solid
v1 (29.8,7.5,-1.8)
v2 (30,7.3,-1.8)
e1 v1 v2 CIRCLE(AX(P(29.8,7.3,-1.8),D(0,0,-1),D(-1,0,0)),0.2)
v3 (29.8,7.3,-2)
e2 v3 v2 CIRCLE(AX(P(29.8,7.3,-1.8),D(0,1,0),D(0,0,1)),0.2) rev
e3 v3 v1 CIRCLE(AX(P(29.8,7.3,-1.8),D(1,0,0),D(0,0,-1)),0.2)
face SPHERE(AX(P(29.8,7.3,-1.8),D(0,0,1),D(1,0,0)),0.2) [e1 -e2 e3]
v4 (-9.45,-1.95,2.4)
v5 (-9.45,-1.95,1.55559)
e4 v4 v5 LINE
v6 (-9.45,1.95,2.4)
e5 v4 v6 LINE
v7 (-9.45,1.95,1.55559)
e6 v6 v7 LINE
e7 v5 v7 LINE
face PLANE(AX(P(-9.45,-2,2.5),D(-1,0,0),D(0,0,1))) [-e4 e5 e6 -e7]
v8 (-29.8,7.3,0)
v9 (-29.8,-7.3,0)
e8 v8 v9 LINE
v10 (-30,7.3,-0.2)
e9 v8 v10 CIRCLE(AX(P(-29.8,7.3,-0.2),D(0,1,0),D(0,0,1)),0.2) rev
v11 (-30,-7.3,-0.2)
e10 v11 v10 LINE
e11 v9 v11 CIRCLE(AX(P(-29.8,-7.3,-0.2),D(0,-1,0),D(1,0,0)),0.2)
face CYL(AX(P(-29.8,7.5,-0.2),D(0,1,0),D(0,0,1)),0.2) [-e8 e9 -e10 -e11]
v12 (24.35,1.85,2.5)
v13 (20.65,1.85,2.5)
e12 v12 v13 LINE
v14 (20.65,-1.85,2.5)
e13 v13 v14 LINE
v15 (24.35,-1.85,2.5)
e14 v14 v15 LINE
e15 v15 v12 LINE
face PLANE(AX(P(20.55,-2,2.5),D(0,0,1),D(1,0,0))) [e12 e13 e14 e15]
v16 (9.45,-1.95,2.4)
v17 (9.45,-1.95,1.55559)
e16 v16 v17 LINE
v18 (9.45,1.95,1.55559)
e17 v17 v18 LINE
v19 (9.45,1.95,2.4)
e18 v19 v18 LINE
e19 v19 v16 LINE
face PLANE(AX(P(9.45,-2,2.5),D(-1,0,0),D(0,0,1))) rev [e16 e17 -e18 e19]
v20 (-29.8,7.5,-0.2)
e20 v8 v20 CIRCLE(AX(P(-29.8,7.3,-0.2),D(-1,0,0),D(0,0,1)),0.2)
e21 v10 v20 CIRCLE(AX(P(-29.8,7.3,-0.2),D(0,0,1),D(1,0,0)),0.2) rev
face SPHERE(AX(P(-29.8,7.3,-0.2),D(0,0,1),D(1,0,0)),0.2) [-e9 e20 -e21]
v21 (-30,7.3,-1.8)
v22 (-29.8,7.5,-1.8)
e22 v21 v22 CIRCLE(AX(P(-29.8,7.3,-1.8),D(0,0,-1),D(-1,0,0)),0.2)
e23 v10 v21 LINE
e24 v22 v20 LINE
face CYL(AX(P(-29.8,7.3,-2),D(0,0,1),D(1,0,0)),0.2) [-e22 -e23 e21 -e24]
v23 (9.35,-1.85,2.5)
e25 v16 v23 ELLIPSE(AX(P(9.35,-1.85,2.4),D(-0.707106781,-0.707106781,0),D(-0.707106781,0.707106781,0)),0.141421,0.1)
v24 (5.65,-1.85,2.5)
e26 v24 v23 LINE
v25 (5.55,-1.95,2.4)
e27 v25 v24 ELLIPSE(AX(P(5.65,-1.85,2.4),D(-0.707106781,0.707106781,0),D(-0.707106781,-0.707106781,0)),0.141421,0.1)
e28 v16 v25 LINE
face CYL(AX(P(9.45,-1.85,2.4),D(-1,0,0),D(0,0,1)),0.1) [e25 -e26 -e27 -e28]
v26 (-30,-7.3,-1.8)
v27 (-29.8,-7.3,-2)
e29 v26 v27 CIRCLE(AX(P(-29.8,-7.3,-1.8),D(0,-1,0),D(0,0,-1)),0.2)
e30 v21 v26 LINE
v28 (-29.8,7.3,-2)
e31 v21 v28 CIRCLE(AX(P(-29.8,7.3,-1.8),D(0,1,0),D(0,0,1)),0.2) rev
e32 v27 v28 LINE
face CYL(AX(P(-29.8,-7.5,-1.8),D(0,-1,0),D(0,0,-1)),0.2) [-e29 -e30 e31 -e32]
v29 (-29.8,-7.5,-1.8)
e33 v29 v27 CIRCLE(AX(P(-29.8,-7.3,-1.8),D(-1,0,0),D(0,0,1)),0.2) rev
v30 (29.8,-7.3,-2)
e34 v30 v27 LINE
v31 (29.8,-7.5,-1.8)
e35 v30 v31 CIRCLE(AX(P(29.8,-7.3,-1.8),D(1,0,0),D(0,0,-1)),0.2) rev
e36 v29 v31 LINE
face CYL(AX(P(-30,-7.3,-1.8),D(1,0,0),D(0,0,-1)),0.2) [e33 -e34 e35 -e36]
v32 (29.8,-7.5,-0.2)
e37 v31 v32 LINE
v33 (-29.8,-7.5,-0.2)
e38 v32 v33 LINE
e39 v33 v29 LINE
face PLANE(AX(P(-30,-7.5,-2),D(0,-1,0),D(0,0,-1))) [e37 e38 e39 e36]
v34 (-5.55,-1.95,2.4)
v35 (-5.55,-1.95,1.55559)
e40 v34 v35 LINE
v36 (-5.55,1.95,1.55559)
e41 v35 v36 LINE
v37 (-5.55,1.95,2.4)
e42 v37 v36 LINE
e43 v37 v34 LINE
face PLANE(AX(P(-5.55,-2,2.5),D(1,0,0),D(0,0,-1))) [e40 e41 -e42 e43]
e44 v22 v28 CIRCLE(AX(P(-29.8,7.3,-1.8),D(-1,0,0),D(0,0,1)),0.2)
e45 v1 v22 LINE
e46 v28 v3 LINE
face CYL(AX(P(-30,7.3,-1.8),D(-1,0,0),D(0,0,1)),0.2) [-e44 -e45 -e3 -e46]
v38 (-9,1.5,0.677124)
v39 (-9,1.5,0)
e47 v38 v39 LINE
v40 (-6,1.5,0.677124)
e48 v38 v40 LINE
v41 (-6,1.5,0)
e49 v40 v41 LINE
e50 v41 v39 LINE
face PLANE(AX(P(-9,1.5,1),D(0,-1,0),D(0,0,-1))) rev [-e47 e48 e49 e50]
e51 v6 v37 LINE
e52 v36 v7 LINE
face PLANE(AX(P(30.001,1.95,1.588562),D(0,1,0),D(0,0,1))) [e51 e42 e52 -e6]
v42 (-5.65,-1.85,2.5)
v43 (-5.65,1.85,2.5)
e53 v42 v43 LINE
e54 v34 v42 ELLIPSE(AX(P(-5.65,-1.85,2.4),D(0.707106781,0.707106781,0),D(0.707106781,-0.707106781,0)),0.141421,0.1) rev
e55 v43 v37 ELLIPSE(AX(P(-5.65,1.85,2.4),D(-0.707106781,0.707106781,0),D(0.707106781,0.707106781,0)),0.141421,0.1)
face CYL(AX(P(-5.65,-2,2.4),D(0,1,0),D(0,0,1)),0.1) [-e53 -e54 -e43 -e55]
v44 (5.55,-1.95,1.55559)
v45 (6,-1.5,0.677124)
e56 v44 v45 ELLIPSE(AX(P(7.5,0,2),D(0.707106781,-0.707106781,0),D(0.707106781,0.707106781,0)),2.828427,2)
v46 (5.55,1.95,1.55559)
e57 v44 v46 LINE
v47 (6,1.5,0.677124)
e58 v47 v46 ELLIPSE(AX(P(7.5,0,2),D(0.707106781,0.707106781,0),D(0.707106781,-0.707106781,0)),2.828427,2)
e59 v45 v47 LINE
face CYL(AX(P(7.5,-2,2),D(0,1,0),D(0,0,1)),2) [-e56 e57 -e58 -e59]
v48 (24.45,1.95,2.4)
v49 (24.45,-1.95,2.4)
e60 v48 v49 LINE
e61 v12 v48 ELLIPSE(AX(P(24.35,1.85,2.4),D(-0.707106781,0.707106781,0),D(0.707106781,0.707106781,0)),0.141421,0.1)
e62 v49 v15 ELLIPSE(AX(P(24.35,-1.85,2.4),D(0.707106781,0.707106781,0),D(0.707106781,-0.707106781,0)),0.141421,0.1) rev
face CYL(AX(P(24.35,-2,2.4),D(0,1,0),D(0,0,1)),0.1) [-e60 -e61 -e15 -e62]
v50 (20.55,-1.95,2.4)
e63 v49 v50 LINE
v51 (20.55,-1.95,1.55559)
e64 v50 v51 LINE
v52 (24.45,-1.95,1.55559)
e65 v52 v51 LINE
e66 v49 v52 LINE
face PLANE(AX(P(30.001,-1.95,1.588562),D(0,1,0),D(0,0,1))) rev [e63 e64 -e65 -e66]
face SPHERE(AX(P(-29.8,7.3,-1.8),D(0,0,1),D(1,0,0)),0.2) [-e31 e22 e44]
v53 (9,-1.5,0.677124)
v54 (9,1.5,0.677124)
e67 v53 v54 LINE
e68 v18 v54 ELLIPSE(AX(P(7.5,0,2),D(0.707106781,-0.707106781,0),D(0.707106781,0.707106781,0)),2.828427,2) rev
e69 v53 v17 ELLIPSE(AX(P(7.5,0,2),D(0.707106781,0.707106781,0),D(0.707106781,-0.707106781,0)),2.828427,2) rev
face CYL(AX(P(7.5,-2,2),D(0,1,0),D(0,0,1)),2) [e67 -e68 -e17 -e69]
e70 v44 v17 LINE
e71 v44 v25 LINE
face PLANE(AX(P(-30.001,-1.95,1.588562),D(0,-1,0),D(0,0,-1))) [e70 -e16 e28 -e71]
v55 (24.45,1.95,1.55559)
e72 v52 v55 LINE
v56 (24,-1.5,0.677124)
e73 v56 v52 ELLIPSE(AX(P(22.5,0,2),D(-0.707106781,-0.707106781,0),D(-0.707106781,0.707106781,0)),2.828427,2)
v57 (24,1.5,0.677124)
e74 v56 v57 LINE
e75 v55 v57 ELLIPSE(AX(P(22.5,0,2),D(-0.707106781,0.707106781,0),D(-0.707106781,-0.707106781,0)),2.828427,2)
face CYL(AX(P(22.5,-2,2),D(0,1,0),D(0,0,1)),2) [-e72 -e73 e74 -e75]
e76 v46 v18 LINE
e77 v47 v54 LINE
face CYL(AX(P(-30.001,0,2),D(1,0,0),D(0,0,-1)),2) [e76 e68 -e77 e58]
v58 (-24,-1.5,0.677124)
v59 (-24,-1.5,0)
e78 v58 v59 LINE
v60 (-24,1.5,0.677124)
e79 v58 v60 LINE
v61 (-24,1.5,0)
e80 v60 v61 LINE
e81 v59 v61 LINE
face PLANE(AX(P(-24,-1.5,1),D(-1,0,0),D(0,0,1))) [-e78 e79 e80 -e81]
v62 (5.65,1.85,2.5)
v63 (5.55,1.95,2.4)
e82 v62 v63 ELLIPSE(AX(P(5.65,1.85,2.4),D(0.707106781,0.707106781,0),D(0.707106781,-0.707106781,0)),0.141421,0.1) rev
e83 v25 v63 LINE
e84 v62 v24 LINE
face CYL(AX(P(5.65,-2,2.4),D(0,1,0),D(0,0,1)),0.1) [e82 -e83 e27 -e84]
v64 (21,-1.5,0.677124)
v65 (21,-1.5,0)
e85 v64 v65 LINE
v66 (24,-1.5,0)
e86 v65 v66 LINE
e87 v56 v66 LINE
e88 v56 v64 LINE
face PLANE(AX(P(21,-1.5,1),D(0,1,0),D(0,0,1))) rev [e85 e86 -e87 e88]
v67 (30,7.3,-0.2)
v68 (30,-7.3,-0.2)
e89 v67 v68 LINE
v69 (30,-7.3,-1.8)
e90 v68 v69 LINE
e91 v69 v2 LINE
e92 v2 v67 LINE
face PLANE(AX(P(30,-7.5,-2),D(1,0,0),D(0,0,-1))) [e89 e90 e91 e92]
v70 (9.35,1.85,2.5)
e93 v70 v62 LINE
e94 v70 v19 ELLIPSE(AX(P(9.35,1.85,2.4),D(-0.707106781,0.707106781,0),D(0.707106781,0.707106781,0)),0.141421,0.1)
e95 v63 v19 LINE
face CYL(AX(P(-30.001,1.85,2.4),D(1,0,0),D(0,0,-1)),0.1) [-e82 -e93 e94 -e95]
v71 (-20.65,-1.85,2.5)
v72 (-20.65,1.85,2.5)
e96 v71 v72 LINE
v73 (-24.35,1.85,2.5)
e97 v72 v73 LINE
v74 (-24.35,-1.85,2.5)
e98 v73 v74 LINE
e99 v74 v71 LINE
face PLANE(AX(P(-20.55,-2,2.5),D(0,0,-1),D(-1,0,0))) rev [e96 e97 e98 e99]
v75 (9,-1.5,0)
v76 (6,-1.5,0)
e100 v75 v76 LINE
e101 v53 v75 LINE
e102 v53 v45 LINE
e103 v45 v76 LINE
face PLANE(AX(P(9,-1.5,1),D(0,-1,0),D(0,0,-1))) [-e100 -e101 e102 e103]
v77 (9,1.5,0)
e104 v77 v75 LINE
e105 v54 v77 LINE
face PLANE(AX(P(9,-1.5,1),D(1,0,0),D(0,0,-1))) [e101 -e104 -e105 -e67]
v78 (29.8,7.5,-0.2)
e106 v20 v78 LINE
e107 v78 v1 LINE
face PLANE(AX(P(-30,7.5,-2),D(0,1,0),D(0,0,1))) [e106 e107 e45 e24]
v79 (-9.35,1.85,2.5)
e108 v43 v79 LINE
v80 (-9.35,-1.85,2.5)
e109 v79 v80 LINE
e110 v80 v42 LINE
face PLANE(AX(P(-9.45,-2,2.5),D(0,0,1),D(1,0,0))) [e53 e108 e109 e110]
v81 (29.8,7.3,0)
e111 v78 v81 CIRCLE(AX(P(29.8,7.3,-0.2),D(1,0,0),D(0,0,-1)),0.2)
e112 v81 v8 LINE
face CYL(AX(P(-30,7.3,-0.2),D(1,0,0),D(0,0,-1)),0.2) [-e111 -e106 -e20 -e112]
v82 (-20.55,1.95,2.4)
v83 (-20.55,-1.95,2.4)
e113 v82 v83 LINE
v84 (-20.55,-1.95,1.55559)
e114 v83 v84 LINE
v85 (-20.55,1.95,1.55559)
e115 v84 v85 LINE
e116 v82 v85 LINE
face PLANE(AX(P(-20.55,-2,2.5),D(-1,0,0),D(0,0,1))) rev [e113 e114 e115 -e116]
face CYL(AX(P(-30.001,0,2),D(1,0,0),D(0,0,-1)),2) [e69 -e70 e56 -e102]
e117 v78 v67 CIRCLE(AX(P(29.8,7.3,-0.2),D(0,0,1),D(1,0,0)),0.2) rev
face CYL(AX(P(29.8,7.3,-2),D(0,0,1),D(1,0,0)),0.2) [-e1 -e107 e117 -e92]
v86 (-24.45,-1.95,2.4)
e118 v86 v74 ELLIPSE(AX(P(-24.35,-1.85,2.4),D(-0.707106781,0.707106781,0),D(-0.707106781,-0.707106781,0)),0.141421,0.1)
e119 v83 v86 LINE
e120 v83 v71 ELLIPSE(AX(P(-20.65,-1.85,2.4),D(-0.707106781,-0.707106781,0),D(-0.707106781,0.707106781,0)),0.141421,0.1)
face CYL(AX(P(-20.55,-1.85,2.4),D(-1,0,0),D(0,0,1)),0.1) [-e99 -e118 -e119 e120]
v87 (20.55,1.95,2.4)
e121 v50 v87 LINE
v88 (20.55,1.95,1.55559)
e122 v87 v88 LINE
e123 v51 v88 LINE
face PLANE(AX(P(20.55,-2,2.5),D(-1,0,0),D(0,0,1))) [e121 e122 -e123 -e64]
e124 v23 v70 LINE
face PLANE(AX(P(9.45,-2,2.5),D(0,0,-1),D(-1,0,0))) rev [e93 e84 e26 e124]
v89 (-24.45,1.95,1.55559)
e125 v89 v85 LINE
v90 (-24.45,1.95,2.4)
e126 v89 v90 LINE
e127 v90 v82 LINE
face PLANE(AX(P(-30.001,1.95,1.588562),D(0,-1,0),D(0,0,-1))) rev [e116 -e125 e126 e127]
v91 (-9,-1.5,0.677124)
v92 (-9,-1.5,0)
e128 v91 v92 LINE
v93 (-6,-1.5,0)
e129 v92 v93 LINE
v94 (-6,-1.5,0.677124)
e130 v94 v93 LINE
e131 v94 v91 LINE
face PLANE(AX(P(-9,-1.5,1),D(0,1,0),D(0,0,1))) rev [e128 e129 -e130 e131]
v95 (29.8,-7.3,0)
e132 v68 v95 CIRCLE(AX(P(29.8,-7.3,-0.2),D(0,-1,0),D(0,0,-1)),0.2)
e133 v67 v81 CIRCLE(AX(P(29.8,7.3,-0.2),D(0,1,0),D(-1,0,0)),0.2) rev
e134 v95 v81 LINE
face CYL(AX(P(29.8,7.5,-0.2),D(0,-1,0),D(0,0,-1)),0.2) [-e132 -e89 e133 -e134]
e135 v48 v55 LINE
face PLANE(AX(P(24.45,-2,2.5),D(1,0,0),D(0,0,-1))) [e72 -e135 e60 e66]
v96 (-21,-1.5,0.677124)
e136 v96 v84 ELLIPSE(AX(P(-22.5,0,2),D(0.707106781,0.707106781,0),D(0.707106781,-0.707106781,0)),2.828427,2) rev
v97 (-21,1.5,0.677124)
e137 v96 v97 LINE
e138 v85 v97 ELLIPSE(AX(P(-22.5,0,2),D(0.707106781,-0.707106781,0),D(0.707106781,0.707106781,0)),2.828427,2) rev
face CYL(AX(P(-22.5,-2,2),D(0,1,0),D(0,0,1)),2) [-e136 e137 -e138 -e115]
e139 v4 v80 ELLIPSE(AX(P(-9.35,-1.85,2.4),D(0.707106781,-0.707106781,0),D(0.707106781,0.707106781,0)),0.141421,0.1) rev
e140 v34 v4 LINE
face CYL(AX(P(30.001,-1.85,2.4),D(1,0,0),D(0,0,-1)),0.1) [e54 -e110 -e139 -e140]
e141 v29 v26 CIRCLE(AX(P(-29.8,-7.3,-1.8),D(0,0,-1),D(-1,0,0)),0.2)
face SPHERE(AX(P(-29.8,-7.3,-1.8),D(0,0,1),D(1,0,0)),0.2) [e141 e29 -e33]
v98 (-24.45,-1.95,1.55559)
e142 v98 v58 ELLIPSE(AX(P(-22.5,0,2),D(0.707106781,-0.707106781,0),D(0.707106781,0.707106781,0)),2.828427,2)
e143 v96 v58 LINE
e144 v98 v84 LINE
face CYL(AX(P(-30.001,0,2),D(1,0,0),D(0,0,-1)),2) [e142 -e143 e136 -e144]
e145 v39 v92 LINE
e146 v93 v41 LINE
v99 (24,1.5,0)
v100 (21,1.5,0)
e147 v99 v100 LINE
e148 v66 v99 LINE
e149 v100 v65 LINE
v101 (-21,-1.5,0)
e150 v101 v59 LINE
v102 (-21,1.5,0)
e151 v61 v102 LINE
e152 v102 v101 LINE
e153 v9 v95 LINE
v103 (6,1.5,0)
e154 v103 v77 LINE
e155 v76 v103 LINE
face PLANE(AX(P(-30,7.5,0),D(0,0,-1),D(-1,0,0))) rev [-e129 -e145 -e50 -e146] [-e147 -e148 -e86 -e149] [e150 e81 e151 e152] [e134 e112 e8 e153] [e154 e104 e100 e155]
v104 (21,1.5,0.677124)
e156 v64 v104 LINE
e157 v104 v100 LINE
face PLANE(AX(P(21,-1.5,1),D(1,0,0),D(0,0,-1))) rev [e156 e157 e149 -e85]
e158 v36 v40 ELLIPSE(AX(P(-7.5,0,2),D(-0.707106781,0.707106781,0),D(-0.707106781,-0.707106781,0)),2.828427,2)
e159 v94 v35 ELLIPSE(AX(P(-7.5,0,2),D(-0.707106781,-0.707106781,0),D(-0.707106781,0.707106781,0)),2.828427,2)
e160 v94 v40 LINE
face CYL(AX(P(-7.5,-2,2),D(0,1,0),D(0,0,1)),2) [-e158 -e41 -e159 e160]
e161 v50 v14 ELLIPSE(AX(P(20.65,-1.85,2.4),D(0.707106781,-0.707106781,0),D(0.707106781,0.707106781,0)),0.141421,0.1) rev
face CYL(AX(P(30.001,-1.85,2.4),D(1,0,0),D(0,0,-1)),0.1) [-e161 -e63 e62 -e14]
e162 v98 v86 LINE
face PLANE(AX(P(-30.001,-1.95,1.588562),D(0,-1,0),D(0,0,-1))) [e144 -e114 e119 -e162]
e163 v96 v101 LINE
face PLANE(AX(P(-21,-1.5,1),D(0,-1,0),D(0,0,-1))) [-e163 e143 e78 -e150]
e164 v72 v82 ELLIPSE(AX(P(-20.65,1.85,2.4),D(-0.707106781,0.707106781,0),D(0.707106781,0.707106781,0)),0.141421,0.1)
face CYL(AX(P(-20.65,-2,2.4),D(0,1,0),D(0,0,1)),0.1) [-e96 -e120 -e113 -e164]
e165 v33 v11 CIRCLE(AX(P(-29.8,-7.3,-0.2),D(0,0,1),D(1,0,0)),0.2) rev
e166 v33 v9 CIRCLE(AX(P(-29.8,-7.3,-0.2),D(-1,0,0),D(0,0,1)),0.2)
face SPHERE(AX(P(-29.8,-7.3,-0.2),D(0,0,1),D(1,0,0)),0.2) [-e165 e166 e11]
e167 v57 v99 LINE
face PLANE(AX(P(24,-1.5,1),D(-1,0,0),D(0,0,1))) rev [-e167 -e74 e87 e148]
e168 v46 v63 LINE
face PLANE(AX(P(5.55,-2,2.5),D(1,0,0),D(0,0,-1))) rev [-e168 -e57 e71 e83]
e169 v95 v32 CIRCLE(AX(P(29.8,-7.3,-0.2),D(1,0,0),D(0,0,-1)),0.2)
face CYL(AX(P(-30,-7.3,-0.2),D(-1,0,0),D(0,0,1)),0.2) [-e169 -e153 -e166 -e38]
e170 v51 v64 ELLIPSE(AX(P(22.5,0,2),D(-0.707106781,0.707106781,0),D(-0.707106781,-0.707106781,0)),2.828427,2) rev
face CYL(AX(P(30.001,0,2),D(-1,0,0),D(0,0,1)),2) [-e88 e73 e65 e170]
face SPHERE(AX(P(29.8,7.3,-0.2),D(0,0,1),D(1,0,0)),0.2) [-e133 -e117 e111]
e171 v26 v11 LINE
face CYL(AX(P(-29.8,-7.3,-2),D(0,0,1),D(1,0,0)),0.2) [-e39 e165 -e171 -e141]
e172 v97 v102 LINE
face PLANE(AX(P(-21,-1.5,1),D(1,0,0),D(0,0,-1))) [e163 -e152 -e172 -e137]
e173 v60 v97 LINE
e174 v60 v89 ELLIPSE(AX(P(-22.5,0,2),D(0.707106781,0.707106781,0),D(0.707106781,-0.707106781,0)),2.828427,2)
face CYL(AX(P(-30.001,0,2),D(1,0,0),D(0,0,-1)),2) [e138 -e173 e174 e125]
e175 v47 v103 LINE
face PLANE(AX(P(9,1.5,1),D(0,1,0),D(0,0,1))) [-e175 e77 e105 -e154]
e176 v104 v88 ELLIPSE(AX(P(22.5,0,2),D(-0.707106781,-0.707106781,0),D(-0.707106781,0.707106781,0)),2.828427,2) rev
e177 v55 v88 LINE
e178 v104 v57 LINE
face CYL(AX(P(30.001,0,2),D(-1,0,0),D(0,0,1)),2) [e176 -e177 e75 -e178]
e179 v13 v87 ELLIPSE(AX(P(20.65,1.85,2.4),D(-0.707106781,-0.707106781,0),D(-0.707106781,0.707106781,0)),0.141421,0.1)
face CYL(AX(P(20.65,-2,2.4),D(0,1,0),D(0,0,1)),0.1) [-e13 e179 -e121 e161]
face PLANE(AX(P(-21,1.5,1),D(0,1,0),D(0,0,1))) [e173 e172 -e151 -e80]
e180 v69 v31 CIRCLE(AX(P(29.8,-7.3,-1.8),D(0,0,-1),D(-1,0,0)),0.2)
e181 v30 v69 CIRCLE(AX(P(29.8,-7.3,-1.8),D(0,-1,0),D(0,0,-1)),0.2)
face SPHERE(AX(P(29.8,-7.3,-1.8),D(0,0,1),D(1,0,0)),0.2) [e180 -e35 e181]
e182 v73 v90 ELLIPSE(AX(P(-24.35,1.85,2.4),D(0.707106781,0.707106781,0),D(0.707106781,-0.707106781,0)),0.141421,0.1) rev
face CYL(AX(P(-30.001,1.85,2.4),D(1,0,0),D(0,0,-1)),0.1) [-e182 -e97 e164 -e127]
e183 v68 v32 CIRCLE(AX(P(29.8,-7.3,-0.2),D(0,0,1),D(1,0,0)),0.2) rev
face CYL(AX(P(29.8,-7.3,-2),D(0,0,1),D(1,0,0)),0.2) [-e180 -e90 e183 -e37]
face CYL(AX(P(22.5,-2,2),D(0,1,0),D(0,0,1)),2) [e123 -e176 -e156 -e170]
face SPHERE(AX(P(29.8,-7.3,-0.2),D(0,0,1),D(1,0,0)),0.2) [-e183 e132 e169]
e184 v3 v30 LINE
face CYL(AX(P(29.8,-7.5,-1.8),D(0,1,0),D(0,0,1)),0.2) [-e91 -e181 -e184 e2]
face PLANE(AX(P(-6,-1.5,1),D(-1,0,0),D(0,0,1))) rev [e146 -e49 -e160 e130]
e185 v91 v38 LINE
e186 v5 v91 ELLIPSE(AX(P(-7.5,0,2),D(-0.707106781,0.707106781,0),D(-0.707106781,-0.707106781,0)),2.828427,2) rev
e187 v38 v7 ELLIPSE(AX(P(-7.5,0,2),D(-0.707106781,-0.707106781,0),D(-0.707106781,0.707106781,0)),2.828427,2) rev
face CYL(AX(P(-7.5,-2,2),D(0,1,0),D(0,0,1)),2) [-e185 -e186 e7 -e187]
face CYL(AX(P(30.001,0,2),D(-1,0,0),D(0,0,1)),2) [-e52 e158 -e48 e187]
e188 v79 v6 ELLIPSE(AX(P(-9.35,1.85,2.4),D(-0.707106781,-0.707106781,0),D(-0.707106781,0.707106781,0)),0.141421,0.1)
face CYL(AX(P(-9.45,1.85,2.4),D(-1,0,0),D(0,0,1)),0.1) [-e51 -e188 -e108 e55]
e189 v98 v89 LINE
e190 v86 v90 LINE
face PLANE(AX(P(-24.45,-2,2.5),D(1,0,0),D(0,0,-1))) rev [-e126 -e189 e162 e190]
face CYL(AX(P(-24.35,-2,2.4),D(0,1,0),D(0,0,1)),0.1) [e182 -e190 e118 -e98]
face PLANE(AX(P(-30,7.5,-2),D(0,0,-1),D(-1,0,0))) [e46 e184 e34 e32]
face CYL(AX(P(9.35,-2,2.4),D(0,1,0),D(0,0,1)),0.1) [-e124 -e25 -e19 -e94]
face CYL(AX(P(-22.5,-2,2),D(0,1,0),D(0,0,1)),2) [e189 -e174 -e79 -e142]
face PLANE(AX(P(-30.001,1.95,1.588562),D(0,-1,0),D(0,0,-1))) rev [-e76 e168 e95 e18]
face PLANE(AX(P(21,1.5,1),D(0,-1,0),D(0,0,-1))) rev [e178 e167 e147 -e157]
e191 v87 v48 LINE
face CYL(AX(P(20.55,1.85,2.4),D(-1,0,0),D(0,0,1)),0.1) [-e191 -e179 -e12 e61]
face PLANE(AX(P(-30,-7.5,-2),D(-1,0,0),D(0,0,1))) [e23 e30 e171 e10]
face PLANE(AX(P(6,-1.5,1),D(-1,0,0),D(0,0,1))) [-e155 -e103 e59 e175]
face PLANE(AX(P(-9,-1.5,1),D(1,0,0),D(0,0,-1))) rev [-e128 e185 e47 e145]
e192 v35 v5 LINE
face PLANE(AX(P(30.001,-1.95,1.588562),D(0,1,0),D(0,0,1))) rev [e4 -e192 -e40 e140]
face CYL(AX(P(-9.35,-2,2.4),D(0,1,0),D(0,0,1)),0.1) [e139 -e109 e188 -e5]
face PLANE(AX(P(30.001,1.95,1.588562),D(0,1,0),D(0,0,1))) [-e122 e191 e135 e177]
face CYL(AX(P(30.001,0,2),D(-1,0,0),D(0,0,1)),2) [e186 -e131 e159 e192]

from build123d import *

# Parameters (mm, degrees)
SKETCH_1_W             = 60
SKETCH_1_H             = 15
EXTRUDE_1_DEPTH        = 2
SKETCH_2_W             = 3
SKETCH_2_H             = 3
EXTRUDE_2_DEPTH        = 1
EXTRUDE_3_DEPTH        = 2
CUT_EXTRUDE_1_REACH    = 42.234
SKETCH_4_W             = 0.944409721
SKETCH_4_H             = 0.05
FILLET_1_R             = 0.1
FILLET_1_OF_MIRROR_2_R = 0.1
FILLET_2_R             = 0.2


# Read off the part's stored shape, not the designer's step: 镜向3
with BuildPart() as part:
    # 草图1 → 凸台-拉伸1 (new body)
    with BuildSketch(Plane.XY):
        Rectangle(SKETCH_1_W, SKETCH_1_H)
    extrude(amount=-EXTRUDE_1_DEPTH)

    # 草图2 → 凸台-拉伸2 (add)
    with BuildSketch(Plane.XY):
        with Locations((-7.5, 0)):
            Rectangle(SKETCH_2_W, SKETCH_2_H)
    extrude_2 = extrude(amount=EXTRUDE_2_DEPTH)

    # 草图3 → 凸台-拉伸3 (add, symmetric)
    with BuildSketch(Plane(origin=(0, 0, 0), x_dir=(1, 0, 0), z_dir=(0, 1, 0))):
        with BuildLine():
            Line((-9.45, -2.5), (-5.55, -2.5))
            Line((-5.55, -2.5), (-5.55, -1.555590279))
            ThreePointArc((-5.55, -1.555590279), (-5.719957697, -1.088161527), (-6, -0.677124344))
            Line((-6, -0.677124344), (-9, -0.677124344))
            ThreePointArc((-9, -0.677124344), (-9.280042303, -1.088161527), (-9.45, -1.555590279))
            Line((-9.45, -1.555590279), (-9.45, -2.5))
        make_face()
    extrude_3 = extrude(amount=EXTRUDE_3_DEPTH, both=True)

    # 草图4 → 切除-拉伸1 (cut, up to next)
    with BuildSketch(Plane.ZY.offset(9.45), mode=Mode.PRIVATE) as cut_extrude_1_sk1:
        with BuildLine():
            Line((1.555590279, 1.95), (1.555590279, 2))
            Line((1.555590279, 2), (0.677124344, 2))
            Line((0.677124344, 2), (0.677124344, 1.5))
            ThreePointArc((0.677124344, 1.5), (1.088161527, 1.780042303), (1.555590279, 1.95))
        make_face()
    cut_extrude_1_tool1 = extrude(cut_extrude_1_sk1.sketch, amount=-CUT_EXTRUDE_1_REACH, mode=Mode.PRIVATE) & part.part
    # 草图4 → 切除-拉伸1 (cut, up to next)
    with BuildSketch(Plane.ZY.offset(9.45), mode=Mode.PRIVATE) as cut_extrude_1_sk2:
        with Locations((2.02779514, 1.975)):
            Rectangle(SKETCH_4_W, SKETCH_4_H)
    cut_extrude_1_tool2 = extrude(cut_extrude_1_sk2.sketch, amount=-CUT_EXTRUDE_1_REACH, mode=Mode.PRIVATE) & part.part
    # 草图4 → 切除-拉伸1 (cut, up to next)
    with BuildSketch(Plane.ZY.offset(9.45), mode=Mode.PRIVATE) as cut_extrude_1_sk3:
        with Locations((2.02779514, -1.975)):
            Rectangle(SKETCH_4_W, SKETCH_4_H)
    cut_extrude_1_tool3 = extrude(cut_extrude_1_sk3.sketch, amount=-CUT_EXTRUDE_1_REACH, mode=Mode.PRIVATE) & part.part
    # 草图4 → 切除-拉伸1 (cut, up to next)
    with BuildSketch(Plane.ZY.offset(9.45), mode=Mode.PRIVATE) as cut_extrude_1_sk4:
        with BuildLine():
            Line((1.555590279, -2), (1.555590279, -1.95))
            ThreePointArc((1.555590279, -1.95), (1.088161527, -1.780042303), (0.677124344, -1.5))
            Line((0.677124344, -1.5), (0.677124344, -2))
            Line((0.677124344, -2), (1.555590279, -2))
        make_face()
    cut_extrude_1_tool4 = extrude(cut_extrude_1_sk4.sketch, amount=-CUT_EXTRUDE_1_REACH, mode=Mode.PRIVATE) & part.part
    cut_extrude_1_1 = cut_extrude_1_tool1.solids().sort_by_distance((-9.45, 1.849056, 0.974505))[0]
    add(cut_extrude_1_1, mode=Mode.SUBTRACT)
    cut_extrude_1_2 = cut_extrude_1_tool2.solids().sort_by_distance((-9.45, 1.975, 2.027795))[0]
    add(cut_extrude_1_2, mode=Mode.SUBTRACT)
    cut_extrude_1_3 = cut_extrude_1_tool3.solids().sort_by_distance((-9.45, -1.975, 2.027795))[0]
    add(cut_extrude_1_3, mode=Mode.SUBTRACT)
    cut_extrude_1_4 = cut_extrude_1_tool4.solids().sort_by_distance((-9.45, -1.849056, 0.974505))[0]
    add(cut_extrude_1_4, mode=Mode.SUBTRACT)
    cut_extrude_1 = cut_extrude_1_1 + cut_extrude_1_2 + cut_extrude_1_3 + cut_extrude_1_4  # 切除-拉伸1 as one shape, for the pattern or mirror that repeats it

    # 圆角1
    fillet_1_edges = [part.edges().sort_by_distance(p)[0] for p in [
        (-7.5, 1.95, 2.5),
        (-9.45, 0, 2.5),
        (-5.55, 0, 2.5),
        (-7.5, -1.95, 2.5),
    ]]
    fillet(fillet_1_edges, radius=FILLET_1_R)

    # 镜向2: 凸台-拉伸2, 凸台-拉伸3, 切除-拉伸1 across plane
    add(extrude_2.mirror(Plane(origin=(-15, 0, 0), x_dir=(0, 0, 1), z_dir=(1, 0, 0))))
    add(extrude_3.mirror(Plane(origin=(-15, 0, 0), x_dir=(0, 0, 1), z_dir=(1, 0, 0))))
    add(cut_extrude_1.mirror(Plane(origin=(-15, 0, 0), x_dir=(0, 0, 1), z_dir=(1, 0, 0))), mode=Mode.SUBTRACT)

    # 圆角1 of 镜向2
    fillet_1_of_mirror_2_edges = [part.edges().sort_by_distance(p)[0] for p in [
        (-22.5, 1.95, 2.5),
        (-20.55, 0, 2.5),
        (-24.45, 0, 2.5),
        (-22.5, -1.95, 2.5),
    ]]
    fillet(fillet_1_of_mirror_2_edges, radius=FILLET_1_OF_MIRROR_2_R)

    # 镜向3: part across plane


with BuildPart() as part_1:
    add(part.part)
    add(part.part.mirror(Plane(origin=(0, 0, 0), x_dir=(0, 0, 1), z_dir=(1, 0, 0))))

    # 圆角2
    fillet_2_edges = [part_1.edges().sort_by_distance(p)[0] for p in [
        (30, 0, -2),
        (0, 7.5, -2),
        (-30, 0, -2),
        (0, 7.5, 0),
        (30, 0, 0),
        (0, -7.5, 0),
        (-30, 0, 0),
        (0, -7.5, -2),
        (-30, 7.5, -1),
        (30, 7.5, -1),
        (30, -7.5, -1),
        (-30, -7.5, -1),
    ]]
    fillet(fillet_2_edges, radius=FILLET_2_R)


solid = part_1.part
